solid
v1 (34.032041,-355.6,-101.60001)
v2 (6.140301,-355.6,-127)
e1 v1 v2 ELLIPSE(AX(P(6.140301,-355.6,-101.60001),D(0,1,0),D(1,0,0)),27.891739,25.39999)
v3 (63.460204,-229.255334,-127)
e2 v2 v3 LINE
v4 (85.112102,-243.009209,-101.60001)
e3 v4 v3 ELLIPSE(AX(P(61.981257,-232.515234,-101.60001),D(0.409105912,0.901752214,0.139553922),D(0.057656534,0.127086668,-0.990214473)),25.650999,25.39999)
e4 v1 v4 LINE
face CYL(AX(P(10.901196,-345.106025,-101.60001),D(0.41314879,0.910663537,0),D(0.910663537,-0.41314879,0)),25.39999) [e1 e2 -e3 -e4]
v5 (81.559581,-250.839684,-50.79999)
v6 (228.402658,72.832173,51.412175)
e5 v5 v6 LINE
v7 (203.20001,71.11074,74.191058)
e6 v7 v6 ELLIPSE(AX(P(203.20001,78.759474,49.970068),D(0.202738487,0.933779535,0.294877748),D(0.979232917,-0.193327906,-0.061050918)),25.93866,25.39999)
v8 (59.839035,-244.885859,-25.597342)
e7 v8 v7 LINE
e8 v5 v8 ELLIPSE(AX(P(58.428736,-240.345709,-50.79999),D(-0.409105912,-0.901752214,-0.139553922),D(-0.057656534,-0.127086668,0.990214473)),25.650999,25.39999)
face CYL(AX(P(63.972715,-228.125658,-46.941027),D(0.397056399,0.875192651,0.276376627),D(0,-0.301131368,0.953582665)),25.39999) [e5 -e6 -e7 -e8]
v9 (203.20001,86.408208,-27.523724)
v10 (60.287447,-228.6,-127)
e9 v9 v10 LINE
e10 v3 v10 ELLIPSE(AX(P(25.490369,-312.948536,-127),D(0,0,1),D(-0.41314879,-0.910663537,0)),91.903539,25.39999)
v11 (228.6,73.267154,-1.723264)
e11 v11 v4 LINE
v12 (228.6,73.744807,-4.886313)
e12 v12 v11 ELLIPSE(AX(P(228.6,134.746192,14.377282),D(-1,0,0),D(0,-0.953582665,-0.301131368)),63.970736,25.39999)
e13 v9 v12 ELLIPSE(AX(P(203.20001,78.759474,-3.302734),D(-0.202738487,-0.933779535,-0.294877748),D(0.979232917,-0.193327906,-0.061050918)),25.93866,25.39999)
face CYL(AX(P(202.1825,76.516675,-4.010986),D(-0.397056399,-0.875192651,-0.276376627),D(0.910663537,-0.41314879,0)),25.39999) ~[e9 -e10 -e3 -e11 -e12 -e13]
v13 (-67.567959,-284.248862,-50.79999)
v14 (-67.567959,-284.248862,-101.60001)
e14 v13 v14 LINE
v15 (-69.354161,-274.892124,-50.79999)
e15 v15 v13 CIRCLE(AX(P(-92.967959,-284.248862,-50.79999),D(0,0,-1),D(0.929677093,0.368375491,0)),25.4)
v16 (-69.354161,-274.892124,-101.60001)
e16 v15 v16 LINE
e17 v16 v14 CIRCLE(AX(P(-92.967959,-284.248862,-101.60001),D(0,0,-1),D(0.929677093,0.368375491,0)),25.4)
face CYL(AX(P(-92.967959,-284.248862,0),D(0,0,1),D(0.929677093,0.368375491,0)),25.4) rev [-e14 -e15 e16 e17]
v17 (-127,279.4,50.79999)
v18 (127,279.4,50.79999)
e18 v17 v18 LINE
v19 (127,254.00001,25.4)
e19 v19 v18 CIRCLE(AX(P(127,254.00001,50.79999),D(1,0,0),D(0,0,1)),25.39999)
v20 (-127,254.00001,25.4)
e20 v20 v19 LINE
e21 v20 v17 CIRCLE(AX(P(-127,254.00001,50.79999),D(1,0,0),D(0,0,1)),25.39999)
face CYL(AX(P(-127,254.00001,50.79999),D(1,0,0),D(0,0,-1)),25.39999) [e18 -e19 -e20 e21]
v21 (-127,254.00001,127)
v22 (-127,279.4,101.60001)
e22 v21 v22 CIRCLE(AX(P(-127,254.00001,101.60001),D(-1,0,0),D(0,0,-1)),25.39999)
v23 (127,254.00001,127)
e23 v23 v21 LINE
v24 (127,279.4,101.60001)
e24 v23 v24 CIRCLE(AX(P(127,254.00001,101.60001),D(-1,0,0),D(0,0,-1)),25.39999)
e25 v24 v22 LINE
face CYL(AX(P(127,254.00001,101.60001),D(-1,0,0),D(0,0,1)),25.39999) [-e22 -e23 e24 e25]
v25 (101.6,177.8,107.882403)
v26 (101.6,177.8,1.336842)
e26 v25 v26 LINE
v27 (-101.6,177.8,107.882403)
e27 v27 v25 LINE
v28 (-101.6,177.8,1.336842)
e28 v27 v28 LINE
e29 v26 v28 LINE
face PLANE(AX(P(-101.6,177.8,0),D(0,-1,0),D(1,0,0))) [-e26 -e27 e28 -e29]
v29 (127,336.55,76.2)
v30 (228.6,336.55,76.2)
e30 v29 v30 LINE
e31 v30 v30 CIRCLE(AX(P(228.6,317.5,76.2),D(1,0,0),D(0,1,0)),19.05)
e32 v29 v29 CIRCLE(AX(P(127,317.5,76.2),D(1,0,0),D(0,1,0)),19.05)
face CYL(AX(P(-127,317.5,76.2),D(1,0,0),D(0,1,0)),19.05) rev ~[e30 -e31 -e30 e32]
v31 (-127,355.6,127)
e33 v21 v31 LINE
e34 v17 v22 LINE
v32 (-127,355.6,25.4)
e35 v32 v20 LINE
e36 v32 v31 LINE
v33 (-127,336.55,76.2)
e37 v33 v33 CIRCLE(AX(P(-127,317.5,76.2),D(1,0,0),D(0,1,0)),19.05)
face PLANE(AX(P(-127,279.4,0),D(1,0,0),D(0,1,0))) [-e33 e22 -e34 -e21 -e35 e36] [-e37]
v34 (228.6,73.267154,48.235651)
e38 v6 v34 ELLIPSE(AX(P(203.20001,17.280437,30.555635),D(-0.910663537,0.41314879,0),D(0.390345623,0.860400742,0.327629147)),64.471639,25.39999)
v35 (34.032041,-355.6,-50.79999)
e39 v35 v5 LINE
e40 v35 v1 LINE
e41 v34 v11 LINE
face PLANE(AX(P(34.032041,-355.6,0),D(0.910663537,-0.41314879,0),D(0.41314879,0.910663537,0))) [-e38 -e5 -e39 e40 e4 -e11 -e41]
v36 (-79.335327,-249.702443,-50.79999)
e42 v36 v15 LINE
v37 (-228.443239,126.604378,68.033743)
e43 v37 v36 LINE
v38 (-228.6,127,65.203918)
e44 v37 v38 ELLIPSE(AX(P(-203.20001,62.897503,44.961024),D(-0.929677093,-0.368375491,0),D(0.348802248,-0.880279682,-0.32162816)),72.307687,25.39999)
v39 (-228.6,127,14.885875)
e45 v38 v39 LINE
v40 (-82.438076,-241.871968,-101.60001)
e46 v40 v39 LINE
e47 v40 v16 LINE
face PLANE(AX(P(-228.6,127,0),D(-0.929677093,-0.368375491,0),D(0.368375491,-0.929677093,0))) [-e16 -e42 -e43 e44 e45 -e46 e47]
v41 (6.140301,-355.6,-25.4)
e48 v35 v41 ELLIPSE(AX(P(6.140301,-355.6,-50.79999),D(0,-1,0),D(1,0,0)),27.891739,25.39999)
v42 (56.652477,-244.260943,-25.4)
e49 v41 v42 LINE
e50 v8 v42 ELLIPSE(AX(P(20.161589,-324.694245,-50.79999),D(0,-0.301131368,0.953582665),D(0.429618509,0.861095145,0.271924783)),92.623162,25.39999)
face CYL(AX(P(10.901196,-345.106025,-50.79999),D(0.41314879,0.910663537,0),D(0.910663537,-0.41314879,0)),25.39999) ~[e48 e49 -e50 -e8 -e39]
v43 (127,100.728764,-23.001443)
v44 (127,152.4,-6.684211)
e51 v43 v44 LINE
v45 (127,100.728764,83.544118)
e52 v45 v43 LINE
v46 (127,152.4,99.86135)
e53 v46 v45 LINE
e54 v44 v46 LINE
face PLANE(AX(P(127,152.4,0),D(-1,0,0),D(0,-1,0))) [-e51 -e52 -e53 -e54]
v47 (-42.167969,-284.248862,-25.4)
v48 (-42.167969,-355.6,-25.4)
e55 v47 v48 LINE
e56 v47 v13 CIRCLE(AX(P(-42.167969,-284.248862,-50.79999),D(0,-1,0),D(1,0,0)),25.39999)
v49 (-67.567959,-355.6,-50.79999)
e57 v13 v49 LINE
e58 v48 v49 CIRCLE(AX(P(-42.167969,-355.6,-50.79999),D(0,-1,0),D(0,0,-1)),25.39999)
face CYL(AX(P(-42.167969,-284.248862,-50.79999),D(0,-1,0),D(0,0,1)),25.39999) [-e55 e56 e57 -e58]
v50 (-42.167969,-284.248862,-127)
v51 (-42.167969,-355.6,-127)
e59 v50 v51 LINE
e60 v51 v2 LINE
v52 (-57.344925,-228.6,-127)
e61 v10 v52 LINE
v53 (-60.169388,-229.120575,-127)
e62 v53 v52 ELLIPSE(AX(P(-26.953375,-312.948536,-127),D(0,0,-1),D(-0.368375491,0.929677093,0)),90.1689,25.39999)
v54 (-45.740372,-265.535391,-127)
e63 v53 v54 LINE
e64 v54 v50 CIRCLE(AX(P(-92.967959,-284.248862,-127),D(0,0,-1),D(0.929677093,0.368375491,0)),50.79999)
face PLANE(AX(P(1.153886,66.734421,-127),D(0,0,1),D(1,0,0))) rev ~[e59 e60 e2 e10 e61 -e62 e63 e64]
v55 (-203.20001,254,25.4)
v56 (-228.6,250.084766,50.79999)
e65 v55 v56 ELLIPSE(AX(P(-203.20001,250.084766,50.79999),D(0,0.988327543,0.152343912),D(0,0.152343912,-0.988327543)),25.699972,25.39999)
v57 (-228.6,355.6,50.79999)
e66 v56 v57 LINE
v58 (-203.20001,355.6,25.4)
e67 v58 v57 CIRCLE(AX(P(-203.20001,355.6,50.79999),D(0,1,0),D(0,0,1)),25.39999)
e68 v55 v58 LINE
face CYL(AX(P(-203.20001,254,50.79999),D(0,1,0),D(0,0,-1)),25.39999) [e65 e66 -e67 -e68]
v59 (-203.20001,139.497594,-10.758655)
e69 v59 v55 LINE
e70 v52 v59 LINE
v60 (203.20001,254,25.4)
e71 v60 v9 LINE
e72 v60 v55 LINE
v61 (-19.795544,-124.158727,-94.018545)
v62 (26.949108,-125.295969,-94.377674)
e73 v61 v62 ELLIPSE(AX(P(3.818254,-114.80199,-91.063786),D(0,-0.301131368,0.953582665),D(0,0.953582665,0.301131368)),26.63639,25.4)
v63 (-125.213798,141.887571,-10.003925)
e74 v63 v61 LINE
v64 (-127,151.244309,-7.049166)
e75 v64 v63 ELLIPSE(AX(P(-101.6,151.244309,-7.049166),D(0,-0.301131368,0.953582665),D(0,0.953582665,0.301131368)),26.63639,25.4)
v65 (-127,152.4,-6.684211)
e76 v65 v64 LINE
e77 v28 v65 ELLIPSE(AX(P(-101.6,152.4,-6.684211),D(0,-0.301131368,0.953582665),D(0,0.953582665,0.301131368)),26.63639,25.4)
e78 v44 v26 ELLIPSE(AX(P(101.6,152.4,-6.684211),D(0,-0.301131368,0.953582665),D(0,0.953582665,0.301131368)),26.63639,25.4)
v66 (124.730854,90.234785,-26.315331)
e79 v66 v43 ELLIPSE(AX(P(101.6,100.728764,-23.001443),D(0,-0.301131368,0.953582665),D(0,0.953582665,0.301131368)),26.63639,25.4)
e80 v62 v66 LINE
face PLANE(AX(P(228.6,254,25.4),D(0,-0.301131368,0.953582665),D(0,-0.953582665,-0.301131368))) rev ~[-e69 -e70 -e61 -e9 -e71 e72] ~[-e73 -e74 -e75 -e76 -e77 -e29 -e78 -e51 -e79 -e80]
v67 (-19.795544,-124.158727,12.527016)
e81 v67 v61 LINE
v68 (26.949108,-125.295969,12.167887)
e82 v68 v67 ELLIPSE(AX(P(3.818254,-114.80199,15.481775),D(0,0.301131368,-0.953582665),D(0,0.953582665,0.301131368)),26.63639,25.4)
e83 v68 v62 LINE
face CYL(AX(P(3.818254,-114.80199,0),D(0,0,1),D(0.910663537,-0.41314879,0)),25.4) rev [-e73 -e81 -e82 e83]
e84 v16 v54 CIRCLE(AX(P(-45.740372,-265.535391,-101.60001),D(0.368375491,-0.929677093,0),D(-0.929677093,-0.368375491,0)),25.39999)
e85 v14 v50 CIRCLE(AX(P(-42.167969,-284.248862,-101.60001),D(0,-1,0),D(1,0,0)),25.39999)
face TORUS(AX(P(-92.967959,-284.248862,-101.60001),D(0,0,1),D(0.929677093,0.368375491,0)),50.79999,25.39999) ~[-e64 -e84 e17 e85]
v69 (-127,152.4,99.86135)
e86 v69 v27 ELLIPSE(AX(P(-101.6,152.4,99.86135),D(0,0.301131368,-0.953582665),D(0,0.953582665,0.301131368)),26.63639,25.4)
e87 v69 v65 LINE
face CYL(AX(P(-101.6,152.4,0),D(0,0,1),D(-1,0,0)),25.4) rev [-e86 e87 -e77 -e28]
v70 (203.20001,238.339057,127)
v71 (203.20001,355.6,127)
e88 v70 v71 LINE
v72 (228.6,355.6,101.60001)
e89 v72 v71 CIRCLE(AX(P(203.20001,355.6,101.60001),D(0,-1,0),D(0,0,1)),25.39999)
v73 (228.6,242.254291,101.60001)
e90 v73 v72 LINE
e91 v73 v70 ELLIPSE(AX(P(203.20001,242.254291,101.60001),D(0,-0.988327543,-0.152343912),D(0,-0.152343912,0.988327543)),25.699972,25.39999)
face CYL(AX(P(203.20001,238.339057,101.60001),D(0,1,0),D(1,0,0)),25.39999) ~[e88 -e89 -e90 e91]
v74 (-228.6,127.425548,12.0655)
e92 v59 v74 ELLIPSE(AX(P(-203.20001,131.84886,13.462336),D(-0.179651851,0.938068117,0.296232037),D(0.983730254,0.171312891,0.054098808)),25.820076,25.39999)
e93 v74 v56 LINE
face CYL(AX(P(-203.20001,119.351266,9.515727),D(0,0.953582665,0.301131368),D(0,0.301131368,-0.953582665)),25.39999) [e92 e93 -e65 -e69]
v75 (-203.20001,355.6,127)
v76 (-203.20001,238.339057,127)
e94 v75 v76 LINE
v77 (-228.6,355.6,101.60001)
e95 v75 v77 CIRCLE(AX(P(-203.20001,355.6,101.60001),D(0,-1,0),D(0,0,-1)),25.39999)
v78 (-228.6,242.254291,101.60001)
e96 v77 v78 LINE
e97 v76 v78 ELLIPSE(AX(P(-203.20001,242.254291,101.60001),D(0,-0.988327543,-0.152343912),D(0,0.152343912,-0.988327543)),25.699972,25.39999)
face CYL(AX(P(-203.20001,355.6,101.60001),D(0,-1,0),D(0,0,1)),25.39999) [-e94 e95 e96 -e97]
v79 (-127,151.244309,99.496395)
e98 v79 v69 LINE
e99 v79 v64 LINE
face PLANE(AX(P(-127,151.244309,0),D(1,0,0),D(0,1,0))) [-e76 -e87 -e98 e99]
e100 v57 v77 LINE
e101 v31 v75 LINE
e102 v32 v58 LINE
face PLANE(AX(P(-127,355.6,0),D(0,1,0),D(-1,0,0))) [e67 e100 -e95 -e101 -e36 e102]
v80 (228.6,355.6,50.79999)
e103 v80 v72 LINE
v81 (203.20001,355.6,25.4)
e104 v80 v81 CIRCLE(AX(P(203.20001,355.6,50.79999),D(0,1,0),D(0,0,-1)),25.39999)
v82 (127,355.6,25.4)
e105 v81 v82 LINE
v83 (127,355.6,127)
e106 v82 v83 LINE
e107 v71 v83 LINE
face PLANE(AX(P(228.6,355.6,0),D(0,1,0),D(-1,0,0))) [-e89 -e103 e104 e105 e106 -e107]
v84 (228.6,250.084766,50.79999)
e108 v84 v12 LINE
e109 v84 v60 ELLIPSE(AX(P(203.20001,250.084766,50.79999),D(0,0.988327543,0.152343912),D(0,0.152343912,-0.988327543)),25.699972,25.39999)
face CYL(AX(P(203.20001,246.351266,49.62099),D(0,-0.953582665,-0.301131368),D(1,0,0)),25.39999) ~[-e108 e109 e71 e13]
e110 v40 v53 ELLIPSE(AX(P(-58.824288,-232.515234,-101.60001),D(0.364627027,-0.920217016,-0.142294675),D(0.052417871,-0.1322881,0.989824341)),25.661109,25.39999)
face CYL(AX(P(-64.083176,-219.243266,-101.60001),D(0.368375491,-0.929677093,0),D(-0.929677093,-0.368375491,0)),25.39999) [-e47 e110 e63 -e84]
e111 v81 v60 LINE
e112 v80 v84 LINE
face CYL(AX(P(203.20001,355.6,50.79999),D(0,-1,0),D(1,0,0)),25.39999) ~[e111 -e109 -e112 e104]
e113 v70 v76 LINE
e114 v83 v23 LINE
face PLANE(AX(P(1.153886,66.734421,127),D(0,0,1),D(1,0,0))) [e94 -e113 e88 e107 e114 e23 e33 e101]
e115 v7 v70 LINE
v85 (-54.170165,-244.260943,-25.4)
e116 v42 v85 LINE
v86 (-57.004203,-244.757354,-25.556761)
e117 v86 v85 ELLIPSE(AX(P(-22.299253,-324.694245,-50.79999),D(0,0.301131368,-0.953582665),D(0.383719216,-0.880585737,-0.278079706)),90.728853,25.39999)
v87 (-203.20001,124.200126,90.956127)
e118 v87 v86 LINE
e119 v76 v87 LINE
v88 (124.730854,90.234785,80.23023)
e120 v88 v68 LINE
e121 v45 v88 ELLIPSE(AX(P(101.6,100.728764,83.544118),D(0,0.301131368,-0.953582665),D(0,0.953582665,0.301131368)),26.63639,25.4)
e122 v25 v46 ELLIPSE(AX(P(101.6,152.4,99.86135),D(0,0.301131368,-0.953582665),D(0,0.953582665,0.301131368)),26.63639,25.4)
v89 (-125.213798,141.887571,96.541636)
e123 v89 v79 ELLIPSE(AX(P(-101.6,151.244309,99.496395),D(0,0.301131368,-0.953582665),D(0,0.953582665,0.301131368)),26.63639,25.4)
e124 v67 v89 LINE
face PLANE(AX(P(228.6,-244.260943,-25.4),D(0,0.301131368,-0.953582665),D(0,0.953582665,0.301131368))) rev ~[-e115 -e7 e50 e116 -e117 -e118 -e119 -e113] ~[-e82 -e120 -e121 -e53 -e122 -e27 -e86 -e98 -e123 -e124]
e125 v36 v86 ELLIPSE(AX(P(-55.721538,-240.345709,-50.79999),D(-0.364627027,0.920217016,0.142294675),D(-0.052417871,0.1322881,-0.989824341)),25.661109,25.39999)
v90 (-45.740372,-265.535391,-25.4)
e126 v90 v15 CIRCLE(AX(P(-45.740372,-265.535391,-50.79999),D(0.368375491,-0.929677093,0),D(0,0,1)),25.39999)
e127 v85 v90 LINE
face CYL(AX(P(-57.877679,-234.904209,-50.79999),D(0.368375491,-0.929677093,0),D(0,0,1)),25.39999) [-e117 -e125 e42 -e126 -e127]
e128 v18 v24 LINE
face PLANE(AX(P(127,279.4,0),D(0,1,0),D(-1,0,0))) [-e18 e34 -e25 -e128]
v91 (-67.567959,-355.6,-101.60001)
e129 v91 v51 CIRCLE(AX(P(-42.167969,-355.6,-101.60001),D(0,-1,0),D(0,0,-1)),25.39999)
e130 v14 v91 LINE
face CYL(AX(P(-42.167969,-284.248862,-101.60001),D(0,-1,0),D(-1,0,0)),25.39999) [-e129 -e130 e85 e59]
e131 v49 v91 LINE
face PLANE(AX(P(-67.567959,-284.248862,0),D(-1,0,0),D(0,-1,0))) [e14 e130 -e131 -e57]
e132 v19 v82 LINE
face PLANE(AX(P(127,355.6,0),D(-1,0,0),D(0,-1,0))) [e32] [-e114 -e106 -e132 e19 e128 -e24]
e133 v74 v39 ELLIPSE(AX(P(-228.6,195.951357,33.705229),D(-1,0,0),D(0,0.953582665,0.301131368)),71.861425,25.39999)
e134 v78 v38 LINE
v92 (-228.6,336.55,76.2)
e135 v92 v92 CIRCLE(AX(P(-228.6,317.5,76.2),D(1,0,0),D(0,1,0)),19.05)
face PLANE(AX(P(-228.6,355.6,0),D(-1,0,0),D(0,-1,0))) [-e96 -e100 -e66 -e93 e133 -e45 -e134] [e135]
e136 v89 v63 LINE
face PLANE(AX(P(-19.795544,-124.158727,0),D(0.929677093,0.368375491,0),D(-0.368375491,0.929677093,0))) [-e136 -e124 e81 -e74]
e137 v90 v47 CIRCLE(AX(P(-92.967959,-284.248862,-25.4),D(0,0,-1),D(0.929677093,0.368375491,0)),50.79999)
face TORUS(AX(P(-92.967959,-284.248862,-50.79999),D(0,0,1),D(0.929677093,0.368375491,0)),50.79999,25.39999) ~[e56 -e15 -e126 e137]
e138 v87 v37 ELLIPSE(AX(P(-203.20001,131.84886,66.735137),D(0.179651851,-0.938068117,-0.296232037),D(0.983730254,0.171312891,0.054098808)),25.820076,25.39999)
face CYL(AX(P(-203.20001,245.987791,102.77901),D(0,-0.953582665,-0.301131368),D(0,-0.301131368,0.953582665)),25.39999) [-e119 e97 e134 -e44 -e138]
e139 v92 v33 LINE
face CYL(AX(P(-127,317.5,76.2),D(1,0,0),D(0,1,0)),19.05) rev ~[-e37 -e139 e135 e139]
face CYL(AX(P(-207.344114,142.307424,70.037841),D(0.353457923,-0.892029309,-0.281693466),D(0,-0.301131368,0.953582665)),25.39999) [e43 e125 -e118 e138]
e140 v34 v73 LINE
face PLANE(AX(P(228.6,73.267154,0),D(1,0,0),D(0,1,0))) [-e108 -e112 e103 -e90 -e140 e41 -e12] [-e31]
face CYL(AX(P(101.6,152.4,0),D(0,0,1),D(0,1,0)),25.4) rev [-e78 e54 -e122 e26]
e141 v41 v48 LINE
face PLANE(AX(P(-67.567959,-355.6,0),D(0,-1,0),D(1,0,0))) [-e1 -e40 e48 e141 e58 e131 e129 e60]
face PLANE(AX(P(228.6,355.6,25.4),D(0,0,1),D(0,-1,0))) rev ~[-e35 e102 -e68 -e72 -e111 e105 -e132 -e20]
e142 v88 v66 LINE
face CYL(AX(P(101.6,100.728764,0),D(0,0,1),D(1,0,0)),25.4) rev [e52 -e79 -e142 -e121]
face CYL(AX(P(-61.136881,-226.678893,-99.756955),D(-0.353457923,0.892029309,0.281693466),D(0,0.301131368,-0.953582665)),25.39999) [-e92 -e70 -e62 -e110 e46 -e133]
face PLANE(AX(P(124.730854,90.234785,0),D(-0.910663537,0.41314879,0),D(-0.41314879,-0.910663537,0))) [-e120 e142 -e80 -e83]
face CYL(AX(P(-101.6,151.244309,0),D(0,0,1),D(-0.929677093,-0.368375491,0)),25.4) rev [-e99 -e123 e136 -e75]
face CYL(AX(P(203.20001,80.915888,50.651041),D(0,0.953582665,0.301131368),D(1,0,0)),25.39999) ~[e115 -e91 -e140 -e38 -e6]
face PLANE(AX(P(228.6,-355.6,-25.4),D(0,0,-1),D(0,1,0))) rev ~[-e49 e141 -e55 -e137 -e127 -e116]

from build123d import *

# Parameters (mm, degrees)
F1_DEPTH = 127
F3_DEPTH = 627.38
F5_DEPTH = 546.1
F6_R     = 19.05
F7_DEPTH = 409.956
F8_R     = 25.39999


# Not quite as in the source:
# - a fillet or chamfer is up to 0.001 mm smaller than in the source, because OpenCascade refuses the exact size


with BuildPart() as f1:
    # F0 (on Top) → F1 (new body, symmetric)
    with BuildSketch(Plane.XY):
        with BuildLine():
            Line((228.6, 73.2671543956), (228.6, 355.6))
            Line((228.6, 355.6), (127, 355.6))
            Line((127, 355.6), (127, 279.4))
            Line((127, 279.4), (-127, 279.4))
            Line((-127, 279.4), (-127, 355.6))
            Line((-127, 355.6), (-228.6, 355.6))
            Line((-228.6, 355.6), (-228.6, 127))
            Line((-228.6, 127), (-69.3541612572, -274.8921242948))
            ThreePointArc((-69.3541612572, -274.8921242948), (-68.0185057912, -279.4860093319), (-67.5679594278, -284.2488617581))
            Line((-67.5679594278, -284.2488617581), (-67.5679594278, -355.6))
            Line((-67.5679594278, -355.6), (34.0320405722, -355.6))
            Line((34.0320405722, -355.6), (228.6, 73.2671543956))
        make_face()
        with BuildLine():
            Line((126.9999997139, 152.3999997139), (126.9999997139, 100.7287641896))
            ThreePointArc((126.9999997139, 100.7287641896), (126.4262326875, 95.3605096932), (124.7308535455, 90.2347849149))
            Line((124.7308535455, 90.2347849149), (26.9491079367, -125.2959690409))
            ThreePointArc((26.9491079367, -125.2959690409), (3.2004851004, -140.194476085), (-19.7955440656, -124.1587272294))
            Line((-19.7955440656, -124.1587272294), (-125.2137978845, 141.8875713817))
            ThreePointArc((-125.2137978845, 141.8875713817), (-126.5494533505, 146.4814564188), (-126.9999997139, 151.244308845))
            Line((-126.9999997139, 151.244308845), (-126.9999997139, 152.3999997139))
            ThreePointArc((-126.9999997139, 152.3999997139), (-119.560511956, 170.360511956), (-101.5999997139, 177.7999997139))
            Line((-101.5999997139, 177.7999997139), (101.5999997139, 177.7999997139))
            ThreePointArc((101.5999997139, 177.7999997139), (119.560511956, 170.360511956), (126.9999997139, 152.3999997139))
        make_face(mode=Mode.SUBTRACT)
    extrude(amount=F1_DEPTH, both=True)

    # F2 (on face) → F3 (cut)
    with BuildSketch(Plane.YZ.offset(228.6)):
        Polygon((-228.6, -127), (-355.6, -127), (-355.6, -25.4), (-399.7474312782, -25.4), (-399.7474312782, -182.4822723866), (403.1273424625, -182.4822723866), (403.1273424625, 126.7705559731), (355.6, 127), (355.6, 25.4), (254, 25.4), align=None)
    extrude(amount=-F3_DEPTH, mode=Mode.SUBTRACT)

    # F4 (on face) → F5 (cut)
    with BuildSketch(Plane.YZ.offset(228.6)):
        Polygon((238.3390568884, 127), (355.6, 127), (355.6, 150.2672582865), (-388.3270025253, 150.2672582865), (-355.6, -25.4), (-244.2609431116, -25.4), (42.6722074132, 65.2104685868), align=None)
    extrude(amount=-F5_DEPTH, mode=Mode.SUBTRACT)

    # F6 (on face) → F7 (cut, symmetric)
    with BuildSketch(Plane.YZ.offset(-127)):
        with Locations((317.5, 76.2)):
            Circle(F6_R)
    extrude(amount=F7_DEPTH, both=True, mode=Mode.SUBTRACT)

    # F8 (radius 25.4 in the source; OpenCascade refuses exactly that, so slightly less here)
    f8_edges = [f1.edges().sort_by_distance(p)[0] for p in [
        (156.572108, -85.496894, 24.736015),
        (228.6, 155.803106, 100.936015),
        (228.6, 296.969528, 127),
        (59.288128, -299.930472, -25.4),
        (-67.567959, -319.924431, -25.4),
        (-155.045734, -58.630472, 33.220149),
        (-228.6, 182.669528, 109.420149),
        (-228.6, 296.969528, 127),
        (-228.6, 304.8, 25.4),
        (-228.6, 190.5, 5.347368),
        (-158.148482, -50.8, -70.852632),
        (-78.525563, -251.746062, -127),
        (-67.567959, -319.924431, -127),
        (160.124628, -77.666423, -79.336765),
        (62.840648, -292.1, -127),
        (228.6, 163.633577, -3.136765),
        (228.6, 304.8, 25.4),
        (0, 279.4, 127),
        (0, 279.4, 25.4),
    ]]
    fillet(f8_edges, radius=F8_R)


solid = f1.part
